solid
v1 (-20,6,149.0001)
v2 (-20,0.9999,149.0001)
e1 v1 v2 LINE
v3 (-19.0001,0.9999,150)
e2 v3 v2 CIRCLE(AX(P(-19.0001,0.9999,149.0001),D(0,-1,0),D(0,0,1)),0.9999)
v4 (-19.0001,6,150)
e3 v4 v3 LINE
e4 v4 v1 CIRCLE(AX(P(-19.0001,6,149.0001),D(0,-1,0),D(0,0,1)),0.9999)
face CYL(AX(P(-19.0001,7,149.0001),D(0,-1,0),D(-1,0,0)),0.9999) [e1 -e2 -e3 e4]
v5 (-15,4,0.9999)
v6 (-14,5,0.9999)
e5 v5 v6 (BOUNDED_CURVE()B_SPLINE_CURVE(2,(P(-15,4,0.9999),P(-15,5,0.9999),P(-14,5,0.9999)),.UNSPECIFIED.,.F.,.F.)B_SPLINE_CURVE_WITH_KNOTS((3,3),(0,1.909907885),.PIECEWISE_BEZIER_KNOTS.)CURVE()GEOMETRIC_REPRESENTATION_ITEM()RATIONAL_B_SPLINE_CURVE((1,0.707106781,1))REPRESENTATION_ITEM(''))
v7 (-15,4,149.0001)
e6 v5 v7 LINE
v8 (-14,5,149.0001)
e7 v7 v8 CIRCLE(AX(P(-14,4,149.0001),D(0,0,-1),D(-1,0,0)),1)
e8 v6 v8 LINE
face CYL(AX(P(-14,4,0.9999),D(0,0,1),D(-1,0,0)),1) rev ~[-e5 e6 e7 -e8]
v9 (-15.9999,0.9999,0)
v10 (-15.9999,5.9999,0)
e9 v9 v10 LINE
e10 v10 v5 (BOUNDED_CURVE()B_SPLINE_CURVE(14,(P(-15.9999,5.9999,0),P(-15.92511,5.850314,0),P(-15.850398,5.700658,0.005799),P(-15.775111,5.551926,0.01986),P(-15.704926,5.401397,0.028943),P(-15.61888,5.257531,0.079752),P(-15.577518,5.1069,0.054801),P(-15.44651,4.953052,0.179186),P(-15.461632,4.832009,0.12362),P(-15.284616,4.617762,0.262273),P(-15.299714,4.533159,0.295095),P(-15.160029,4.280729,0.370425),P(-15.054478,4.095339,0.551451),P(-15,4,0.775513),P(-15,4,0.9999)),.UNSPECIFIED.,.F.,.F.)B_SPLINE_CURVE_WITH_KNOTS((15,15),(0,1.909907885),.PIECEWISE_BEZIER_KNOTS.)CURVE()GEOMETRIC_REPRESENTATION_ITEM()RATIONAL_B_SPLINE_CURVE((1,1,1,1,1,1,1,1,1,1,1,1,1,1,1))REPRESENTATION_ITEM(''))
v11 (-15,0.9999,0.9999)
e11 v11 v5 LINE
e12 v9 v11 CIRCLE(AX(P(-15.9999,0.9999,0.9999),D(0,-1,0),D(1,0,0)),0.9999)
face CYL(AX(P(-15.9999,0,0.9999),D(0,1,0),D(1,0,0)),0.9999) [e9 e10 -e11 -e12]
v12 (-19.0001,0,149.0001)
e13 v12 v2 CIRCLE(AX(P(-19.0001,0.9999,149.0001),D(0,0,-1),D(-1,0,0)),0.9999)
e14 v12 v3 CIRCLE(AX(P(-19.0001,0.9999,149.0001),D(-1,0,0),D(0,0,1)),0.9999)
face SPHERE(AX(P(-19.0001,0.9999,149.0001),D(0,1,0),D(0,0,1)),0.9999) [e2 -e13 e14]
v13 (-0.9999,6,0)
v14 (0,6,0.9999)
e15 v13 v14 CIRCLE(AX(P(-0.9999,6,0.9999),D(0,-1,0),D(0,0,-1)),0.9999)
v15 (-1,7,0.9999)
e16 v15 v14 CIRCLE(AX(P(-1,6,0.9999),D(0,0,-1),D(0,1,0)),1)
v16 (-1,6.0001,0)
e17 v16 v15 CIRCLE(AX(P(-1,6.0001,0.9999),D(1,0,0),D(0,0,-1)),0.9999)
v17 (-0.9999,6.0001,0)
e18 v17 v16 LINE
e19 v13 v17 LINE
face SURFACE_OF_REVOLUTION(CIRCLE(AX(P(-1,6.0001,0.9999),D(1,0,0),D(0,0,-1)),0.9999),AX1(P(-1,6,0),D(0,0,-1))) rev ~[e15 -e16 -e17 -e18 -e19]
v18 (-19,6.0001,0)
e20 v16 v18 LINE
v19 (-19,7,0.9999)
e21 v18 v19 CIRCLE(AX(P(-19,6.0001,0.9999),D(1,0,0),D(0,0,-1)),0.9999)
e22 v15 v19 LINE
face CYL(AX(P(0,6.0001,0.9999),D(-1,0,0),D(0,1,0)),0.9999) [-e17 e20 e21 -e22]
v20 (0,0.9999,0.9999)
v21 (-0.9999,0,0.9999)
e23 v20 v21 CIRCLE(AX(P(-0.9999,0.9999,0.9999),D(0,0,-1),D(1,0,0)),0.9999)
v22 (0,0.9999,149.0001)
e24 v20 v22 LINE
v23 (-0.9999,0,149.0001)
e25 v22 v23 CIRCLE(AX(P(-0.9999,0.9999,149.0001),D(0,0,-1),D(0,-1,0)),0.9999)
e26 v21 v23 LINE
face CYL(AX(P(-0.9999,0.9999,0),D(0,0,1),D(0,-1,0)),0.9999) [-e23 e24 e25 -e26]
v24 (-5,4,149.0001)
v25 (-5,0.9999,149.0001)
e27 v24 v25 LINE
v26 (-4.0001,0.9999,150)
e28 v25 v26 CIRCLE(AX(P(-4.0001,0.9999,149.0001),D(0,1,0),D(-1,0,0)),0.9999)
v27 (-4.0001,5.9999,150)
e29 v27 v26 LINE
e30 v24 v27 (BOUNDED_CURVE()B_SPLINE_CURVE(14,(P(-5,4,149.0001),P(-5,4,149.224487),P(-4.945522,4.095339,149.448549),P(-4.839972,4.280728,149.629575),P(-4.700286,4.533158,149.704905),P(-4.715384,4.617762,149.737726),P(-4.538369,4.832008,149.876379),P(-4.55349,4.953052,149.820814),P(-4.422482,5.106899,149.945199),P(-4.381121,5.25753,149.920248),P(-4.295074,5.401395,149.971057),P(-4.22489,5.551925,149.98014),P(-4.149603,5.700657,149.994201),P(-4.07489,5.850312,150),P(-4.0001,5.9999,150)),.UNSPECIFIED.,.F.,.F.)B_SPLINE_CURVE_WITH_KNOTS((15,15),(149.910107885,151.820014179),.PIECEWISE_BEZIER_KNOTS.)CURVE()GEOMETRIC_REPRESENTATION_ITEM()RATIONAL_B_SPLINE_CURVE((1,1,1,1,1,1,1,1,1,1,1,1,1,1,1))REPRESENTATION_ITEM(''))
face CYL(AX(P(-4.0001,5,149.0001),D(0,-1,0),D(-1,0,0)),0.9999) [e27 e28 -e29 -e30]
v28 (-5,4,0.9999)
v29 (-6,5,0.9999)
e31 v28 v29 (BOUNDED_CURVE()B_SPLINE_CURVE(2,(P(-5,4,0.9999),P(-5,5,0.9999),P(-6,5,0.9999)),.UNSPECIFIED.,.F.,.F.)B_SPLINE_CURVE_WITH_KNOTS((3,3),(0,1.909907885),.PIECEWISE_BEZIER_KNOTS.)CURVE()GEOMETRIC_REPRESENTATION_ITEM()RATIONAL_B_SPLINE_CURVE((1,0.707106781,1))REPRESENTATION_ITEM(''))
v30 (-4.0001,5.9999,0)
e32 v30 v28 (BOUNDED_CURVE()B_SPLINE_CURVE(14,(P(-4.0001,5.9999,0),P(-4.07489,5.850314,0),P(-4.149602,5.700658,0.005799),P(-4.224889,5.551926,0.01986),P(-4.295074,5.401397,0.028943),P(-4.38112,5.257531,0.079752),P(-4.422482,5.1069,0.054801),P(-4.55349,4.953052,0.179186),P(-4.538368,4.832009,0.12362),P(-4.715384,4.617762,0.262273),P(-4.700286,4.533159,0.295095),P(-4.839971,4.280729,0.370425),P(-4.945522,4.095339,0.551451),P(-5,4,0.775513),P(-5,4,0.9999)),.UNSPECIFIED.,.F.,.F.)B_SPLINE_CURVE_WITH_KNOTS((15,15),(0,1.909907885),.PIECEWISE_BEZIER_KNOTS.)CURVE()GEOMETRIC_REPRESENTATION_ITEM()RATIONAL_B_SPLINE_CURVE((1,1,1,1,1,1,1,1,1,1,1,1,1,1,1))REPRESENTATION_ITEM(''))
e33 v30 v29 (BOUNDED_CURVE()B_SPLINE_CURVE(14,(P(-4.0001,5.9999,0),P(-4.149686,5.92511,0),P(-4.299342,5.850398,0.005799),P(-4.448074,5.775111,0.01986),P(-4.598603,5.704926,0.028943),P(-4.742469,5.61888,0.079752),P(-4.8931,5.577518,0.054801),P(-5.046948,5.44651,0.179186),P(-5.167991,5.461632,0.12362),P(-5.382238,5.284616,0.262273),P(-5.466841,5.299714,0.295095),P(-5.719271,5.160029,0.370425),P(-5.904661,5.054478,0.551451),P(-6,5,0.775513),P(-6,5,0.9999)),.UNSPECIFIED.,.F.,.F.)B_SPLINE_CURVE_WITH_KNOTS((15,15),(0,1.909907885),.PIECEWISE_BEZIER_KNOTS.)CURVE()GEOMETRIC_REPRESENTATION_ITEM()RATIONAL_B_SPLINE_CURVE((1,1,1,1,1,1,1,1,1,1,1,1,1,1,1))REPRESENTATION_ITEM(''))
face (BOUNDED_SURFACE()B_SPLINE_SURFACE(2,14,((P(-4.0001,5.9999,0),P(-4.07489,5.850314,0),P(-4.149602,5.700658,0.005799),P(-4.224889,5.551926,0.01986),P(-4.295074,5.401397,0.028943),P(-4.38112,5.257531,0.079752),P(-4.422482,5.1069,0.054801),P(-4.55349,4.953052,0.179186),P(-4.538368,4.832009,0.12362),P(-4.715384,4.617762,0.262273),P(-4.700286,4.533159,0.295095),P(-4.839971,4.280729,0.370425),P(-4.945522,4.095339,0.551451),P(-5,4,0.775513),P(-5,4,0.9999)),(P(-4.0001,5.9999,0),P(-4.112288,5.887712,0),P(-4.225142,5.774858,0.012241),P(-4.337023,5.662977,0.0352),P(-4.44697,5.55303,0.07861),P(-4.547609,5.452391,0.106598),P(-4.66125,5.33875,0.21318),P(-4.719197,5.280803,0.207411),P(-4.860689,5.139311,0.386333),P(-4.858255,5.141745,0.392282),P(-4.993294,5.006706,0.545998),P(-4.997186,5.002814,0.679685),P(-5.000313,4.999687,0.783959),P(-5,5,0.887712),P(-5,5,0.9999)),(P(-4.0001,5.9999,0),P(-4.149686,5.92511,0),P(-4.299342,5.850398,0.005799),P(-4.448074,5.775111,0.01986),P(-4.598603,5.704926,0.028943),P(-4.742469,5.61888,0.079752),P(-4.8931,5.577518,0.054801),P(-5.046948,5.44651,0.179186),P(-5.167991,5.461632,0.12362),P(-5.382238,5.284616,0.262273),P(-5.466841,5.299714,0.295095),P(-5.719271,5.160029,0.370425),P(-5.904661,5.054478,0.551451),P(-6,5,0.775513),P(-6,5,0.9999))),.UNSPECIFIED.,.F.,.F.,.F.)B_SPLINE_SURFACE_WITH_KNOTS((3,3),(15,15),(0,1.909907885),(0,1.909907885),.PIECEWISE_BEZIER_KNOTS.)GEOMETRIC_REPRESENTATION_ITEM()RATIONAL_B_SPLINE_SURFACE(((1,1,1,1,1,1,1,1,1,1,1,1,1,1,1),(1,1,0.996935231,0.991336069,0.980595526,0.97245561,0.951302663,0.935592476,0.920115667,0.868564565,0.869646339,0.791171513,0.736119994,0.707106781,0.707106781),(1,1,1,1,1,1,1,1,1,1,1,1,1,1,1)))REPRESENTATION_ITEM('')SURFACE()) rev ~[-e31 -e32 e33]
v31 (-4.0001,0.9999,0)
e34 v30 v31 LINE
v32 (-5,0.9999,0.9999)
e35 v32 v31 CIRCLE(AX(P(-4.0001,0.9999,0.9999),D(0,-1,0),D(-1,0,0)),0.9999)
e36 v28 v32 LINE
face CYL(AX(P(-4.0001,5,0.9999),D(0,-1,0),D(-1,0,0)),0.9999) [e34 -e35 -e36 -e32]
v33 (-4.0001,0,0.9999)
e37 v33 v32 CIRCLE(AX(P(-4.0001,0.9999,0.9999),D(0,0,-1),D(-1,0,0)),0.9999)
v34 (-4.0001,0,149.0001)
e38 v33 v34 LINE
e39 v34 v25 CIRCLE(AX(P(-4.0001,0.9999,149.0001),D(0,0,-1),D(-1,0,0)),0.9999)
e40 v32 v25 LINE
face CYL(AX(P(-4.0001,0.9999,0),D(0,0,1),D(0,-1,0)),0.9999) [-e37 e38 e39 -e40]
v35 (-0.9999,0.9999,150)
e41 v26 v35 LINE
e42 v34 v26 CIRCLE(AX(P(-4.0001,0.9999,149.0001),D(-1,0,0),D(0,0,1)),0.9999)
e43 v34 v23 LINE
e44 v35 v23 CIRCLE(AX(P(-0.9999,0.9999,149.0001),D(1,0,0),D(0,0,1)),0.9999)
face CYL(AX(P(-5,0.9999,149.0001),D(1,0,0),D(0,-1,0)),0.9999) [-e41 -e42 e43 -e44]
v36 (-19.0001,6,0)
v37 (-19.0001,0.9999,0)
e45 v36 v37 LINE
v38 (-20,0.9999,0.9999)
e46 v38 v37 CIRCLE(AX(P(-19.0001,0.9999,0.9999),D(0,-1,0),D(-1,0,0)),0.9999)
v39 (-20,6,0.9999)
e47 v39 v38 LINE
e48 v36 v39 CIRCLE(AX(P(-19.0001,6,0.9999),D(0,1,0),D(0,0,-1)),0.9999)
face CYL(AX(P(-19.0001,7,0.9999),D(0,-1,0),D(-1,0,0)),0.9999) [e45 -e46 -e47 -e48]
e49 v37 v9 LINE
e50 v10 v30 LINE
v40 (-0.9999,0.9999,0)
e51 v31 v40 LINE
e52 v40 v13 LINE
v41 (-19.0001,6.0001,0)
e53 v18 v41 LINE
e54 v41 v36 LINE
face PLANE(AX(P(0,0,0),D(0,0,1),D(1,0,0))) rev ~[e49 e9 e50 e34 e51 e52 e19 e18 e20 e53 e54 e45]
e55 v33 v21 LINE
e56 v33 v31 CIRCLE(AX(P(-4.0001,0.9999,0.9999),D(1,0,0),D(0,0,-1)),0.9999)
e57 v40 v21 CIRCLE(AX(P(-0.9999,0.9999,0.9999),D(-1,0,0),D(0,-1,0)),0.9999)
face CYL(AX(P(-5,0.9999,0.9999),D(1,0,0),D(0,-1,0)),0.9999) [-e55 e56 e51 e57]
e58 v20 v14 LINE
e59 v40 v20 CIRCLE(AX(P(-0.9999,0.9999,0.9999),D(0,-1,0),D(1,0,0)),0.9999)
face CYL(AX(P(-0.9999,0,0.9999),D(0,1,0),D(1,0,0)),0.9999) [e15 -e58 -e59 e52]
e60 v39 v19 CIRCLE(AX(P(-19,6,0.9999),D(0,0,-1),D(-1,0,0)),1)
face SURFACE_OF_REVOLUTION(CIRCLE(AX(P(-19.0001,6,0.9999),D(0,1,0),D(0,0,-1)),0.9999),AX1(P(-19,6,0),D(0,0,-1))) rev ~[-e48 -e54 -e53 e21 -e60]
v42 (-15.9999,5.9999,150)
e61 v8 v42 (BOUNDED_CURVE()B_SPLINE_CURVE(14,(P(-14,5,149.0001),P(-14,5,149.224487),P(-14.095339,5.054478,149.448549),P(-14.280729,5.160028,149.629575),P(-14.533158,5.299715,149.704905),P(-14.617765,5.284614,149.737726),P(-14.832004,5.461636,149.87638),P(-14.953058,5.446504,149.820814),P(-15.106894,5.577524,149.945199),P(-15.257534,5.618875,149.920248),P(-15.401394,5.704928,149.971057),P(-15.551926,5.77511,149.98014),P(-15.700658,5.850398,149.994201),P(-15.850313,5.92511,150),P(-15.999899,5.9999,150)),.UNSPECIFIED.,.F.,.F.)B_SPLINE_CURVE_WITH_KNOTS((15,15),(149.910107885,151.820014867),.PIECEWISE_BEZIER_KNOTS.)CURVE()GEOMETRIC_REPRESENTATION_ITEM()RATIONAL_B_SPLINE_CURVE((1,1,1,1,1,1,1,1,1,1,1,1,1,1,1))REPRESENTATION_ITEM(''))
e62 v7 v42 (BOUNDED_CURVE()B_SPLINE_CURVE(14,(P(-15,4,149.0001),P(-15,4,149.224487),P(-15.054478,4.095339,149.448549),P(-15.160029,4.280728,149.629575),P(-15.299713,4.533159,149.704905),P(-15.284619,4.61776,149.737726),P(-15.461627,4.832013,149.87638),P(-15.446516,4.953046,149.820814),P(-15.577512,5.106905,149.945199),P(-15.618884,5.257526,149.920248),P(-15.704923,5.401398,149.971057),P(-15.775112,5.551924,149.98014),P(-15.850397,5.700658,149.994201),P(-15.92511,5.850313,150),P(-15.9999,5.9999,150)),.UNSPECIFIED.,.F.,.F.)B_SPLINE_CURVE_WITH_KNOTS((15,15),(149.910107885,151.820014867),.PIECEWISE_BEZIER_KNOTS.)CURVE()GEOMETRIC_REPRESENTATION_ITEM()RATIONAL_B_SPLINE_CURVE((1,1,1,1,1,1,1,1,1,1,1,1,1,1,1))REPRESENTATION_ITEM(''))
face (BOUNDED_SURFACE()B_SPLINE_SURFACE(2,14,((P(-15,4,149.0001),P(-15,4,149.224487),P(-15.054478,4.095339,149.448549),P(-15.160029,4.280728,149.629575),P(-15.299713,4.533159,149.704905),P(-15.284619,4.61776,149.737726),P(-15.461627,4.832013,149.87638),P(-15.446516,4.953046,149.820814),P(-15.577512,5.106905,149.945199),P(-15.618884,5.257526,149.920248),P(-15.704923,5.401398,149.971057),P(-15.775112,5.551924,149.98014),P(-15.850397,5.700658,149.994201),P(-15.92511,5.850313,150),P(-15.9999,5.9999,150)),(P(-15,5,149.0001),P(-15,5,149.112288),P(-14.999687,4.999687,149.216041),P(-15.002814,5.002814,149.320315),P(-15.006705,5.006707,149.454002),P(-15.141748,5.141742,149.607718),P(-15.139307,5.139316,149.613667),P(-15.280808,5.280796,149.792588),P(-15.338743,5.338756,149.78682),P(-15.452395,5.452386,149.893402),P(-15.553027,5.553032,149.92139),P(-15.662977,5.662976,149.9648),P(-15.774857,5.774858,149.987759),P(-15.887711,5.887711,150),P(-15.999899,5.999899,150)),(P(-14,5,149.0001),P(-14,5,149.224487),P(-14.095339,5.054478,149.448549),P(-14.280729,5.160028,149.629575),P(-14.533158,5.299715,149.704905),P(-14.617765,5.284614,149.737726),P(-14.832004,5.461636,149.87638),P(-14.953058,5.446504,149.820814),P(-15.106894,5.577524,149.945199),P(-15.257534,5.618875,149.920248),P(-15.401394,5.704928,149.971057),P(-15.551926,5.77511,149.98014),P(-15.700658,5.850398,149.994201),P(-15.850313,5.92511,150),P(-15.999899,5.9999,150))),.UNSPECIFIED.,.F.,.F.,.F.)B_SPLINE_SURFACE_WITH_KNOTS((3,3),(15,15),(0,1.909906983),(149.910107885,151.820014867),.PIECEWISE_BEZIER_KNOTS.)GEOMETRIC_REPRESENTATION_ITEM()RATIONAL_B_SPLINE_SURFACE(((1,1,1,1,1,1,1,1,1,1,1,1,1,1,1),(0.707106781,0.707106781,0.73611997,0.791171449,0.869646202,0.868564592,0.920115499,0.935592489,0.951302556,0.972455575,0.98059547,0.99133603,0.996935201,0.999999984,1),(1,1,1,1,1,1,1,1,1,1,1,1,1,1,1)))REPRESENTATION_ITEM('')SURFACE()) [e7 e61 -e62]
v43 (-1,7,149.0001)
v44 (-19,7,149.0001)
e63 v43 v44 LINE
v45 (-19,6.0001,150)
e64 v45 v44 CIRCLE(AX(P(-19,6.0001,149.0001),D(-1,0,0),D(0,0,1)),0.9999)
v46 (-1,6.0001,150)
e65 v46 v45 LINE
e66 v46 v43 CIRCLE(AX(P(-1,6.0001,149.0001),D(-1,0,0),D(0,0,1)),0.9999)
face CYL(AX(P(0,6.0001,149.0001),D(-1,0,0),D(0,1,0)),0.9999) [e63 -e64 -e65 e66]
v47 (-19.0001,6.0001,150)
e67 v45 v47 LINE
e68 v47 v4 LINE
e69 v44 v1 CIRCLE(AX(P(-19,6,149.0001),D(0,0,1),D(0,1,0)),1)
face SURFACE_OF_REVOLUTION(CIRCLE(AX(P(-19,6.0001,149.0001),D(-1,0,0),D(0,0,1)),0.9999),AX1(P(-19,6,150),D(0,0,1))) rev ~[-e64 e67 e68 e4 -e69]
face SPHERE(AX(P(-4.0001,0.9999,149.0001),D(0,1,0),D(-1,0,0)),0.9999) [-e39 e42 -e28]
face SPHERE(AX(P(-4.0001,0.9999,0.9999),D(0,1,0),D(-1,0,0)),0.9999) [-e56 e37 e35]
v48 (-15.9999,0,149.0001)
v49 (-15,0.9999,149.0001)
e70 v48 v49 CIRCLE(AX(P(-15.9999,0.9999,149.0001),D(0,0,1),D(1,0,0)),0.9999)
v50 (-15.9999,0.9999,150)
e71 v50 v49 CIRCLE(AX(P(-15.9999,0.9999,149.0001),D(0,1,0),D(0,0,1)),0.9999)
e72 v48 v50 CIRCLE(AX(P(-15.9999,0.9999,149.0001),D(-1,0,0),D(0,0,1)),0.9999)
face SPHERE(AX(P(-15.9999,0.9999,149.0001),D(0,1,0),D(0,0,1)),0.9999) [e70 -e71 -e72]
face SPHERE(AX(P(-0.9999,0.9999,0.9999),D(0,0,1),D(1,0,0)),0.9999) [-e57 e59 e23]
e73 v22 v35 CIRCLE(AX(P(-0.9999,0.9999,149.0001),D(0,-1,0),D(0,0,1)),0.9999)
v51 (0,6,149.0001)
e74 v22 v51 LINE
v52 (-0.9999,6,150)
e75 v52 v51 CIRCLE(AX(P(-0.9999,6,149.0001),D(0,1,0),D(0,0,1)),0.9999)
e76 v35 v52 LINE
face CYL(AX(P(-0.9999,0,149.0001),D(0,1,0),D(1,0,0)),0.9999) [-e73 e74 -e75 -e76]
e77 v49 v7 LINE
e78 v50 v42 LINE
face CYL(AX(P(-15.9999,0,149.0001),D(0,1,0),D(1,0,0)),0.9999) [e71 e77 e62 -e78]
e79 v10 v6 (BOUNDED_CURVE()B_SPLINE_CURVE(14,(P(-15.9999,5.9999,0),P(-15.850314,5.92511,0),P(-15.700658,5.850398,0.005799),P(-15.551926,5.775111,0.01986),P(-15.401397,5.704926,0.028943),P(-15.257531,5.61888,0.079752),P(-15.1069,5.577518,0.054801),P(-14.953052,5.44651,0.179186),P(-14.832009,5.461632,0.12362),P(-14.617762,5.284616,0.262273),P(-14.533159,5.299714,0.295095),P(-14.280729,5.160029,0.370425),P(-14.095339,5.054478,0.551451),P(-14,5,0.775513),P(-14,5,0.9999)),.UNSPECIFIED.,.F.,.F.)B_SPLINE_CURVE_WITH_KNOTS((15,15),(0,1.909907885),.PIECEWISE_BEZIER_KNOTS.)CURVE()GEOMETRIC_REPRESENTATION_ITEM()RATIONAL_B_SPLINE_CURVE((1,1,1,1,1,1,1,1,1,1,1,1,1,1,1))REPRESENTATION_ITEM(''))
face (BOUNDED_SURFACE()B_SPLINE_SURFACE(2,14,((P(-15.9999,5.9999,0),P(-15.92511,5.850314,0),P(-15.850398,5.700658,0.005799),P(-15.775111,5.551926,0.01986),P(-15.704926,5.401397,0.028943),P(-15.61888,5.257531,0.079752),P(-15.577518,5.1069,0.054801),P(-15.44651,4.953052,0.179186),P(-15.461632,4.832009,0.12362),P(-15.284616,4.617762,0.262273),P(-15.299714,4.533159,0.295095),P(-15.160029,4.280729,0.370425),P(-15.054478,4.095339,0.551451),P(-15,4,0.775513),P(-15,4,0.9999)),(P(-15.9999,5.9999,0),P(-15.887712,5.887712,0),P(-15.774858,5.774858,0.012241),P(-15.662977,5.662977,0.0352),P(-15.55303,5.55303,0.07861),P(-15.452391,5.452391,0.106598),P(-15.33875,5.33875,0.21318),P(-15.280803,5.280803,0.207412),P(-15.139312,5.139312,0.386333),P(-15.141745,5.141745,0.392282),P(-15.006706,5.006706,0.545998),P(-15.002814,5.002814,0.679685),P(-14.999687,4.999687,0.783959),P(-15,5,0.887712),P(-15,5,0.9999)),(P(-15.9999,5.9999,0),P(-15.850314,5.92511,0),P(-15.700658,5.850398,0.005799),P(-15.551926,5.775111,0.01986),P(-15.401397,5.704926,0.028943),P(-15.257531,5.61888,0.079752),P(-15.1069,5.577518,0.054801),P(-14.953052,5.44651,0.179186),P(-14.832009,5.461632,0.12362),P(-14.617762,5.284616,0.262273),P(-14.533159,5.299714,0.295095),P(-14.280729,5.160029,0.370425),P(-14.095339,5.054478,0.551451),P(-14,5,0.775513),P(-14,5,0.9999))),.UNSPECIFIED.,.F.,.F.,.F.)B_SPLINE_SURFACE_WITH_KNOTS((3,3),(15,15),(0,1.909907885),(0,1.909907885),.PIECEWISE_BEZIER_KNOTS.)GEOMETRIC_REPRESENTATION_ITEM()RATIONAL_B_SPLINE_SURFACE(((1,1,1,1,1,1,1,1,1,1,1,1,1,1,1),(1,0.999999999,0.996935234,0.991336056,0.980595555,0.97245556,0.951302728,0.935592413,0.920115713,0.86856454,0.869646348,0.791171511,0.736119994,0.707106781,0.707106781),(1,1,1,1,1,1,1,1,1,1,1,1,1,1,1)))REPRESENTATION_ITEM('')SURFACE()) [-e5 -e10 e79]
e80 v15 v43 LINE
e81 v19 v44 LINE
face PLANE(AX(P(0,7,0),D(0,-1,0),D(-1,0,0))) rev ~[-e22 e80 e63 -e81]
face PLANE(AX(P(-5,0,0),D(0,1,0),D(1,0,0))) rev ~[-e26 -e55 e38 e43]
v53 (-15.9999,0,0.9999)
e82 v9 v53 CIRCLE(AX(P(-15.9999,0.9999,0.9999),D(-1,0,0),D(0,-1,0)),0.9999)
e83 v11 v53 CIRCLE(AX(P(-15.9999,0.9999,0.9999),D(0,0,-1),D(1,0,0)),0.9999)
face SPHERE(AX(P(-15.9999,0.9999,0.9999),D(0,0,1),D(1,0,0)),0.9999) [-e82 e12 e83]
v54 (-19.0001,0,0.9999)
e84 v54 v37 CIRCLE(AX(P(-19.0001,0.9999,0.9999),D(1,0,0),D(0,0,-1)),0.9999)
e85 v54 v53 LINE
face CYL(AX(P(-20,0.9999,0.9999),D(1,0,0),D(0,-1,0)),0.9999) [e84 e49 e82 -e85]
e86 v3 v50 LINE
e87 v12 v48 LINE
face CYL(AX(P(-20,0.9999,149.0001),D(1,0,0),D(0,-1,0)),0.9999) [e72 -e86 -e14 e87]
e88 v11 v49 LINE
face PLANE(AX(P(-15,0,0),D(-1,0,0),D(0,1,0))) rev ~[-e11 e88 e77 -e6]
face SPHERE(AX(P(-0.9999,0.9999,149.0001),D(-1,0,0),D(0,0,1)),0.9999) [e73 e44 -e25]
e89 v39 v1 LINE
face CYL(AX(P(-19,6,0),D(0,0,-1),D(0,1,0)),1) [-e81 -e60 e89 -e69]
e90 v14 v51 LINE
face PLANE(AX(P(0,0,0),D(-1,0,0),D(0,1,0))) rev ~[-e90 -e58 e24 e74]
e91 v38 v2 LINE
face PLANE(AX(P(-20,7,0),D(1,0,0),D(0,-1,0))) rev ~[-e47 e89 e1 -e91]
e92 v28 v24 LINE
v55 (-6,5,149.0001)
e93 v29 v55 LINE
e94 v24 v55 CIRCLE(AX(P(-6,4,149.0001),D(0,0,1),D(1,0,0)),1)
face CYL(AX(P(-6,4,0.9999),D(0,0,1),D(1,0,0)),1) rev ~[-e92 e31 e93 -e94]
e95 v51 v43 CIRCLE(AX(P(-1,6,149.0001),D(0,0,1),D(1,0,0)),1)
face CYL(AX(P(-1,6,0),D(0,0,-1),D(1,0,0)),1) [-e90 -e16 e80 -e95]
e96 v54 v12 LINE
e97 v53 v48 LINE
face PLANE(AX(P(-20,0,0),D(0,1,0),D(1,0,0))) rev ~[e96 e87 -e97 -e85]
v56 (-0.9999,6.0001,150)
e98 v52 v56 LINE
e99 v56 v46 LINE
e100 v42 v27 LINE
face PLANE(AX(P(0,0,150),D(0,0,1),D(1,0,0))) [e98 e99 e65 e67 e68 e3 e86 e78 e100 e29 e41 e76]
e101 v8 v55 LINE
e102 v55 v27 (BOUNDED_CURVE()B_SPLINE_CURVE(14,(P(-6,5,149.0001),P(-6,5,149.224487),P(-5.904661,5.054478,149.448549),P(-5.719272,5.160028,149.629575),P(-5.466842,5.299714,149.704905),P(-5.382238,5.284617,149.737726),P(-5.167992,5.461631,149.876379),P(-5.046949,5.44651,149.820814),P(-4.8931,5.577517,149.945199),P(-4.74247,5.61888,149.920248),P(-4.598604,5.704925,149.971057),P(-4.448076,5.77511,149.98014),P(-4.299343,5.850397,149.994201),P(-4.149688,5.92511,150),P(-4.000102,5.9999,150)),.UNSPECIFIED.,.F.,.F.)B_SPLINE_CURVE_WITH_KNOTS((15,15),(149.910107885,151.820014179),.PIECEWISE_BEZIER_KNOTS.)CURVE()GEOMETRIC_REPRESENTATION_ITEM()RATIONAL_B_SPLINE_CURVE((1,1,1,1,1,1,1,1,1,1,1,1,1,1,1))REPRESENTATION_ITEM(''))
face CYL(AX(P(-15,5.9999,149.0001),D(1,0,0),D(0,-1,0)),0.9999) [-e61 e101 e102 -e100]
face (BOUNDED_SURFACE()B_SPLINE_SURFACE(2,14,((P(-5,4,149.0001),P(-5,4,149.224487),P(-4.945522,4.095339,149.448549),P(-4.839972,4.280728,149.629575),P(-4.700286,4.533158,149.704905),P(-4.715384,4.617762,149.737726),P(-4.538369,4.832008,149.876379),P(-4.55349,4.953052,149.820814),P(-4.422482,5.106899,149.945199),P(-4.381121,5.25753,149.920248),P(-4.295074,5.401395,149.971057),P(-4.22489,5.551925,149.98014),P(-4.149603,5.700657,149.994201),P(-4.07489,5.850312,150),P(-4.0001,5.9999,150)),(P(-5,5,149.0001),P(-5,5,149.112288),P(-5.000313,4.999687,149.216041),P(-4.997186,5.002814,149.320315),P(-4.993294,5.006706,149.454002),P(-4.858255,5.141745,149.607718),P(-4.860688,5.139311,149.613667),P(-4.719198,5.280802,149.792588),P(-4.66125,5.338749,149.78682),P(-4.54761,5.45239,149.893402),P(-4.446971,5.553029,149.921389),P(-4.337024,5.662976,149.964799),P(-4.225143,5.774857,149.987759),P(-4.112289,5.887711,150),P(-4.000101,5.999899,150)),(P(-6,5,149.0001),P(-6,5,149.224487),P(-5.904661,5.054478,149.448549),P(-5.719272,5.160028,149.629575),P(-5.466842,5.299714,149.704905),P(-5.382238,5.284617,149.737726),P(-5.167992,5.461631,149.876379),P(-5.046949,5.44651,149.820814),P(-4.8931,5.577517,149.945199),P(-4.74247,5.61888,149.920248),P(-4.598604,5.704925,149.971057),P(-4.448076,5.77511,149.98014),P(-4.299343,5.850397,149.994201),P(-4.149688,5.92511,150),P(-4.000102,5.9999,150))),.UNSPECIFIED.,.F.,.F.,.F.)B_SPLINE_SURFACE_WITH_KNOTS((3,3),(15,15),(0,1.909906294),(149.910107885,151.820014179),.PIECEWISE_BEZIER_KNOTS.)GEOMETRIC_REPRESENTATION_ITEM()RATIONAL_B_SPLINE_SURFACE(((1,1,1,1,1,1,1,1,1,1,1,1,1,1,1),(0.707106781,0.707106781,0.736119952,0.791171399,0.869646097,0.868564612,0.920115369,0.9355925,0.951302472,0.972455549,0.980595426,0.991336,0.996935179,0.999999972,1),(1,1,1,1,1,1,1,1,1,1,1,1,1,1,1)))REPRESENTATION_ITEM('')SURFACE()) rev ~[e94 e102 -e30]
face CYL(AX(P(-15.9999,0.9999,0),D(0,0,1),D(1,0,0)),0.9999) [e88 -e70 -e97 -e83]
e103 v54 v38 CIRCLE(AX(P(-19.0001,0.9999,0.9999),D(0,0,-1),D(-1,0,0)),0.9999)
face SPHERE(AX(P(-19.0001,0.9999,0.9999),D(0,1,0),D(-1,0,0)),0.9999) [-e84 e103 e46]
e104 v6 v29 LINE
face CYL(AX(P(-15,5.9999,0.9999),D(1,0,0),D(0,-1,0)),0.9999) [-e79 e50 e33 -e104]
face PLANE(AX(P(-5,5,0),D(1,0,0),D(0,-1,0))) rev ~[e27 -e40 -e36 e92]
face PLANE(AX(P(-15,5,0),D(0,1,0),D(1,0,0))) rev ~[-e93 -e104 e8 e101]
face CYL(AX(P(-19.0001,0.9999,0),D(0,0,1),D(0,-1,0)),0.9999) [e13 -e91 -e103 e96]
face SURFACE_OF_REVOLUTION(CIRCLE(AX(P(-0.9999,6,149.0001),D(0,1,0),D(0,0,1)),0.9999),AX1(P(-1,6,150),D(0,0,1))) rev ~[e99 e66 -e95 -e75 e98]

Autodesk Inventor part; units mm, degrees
ref_plane "YZ Plane" through (0, 0, 0) normal (1, 0, 0) x (0, 1, 0)
ref_plane "XZ Plane" through (0, 0, 0) normal (0, 1, 0) x (-1, 0, 0)
ref_plane "XY Plane" through (0, 0, 0) normal (0, 0, 1) x (1, 0, 0)
sketch "Sketch3" plane through (0, 0, 0) normal (0, 0, 1) x (1, 0, 0)
  line L0 (0, 0) -> (0, 7)
  line L1 (0, 7) -> (-20, 7)
  line L2 (-20, 7) -> (-20, 0)
  line L3 (-20, 0) -> (-15, 0)
  line L4 (-15, 0) -> (-15, 5)
  line L5 (-15, 5) -> (-5, 5)
  line L6 (-15, 5) -> (-5, 5) construction
  line L7 (-5, 5) -> (-5, 0)
  line L8 (-5, 0) -> (0, 0)
  dimension "d22" = 7
  dimension "d23" = 20
  dimension "d24" = 90
  dimension "d25" = 7
  dimension "d26" = 90
  dimension "d27" = 5
  dimension "d28" = 90
  dimension "d29" = 5
  dimension "d30" = 10
  dimension "d31" = 0
  dimension "d32" = 5
  dimension "d33" = 90
extrude "Extrusion3" add sketch "Sketch3" along normal blind 150
fillet "Fillet4" radius 1 20 edges at (-15, 2.5, 150) (-10, 5, 150) (-5, 2.5, 150) (-5, 2.5, 0) (-5, 0, 75) (-2.5, 0, 150) (0, 3.5, 150) (0, 0, 75) (0, 3.5, 0) (-10, 7, 150) (-20, 3.5, 150) (-17.5, 0, 150) (-15, 0, 75) (-15, 2.5, 0) (-20, 3.5, 0) (-20, 0, 75) (-10, 7, 0) (-10, 5, 0) (-2.5, 0, 0) (-17.5, 0, 0)
fillet "Fillet5" radius 1 2 edges at (-4.7071, 5.2929, 149.7071) (-15.2929, 5.2929, 149.7071)
fillet "Fillet6" radius 1 6 edges at (-0.2929, 6.7071, 149.7071) (-0.2929, 6.7071, 0.2929) (0, 7, 75) (-19.7071, 6.7071, 149.7071) (-19.7071, 6.7071, 0.2929) (-20, 7, 75)
properties part number "Cable_Cover"
